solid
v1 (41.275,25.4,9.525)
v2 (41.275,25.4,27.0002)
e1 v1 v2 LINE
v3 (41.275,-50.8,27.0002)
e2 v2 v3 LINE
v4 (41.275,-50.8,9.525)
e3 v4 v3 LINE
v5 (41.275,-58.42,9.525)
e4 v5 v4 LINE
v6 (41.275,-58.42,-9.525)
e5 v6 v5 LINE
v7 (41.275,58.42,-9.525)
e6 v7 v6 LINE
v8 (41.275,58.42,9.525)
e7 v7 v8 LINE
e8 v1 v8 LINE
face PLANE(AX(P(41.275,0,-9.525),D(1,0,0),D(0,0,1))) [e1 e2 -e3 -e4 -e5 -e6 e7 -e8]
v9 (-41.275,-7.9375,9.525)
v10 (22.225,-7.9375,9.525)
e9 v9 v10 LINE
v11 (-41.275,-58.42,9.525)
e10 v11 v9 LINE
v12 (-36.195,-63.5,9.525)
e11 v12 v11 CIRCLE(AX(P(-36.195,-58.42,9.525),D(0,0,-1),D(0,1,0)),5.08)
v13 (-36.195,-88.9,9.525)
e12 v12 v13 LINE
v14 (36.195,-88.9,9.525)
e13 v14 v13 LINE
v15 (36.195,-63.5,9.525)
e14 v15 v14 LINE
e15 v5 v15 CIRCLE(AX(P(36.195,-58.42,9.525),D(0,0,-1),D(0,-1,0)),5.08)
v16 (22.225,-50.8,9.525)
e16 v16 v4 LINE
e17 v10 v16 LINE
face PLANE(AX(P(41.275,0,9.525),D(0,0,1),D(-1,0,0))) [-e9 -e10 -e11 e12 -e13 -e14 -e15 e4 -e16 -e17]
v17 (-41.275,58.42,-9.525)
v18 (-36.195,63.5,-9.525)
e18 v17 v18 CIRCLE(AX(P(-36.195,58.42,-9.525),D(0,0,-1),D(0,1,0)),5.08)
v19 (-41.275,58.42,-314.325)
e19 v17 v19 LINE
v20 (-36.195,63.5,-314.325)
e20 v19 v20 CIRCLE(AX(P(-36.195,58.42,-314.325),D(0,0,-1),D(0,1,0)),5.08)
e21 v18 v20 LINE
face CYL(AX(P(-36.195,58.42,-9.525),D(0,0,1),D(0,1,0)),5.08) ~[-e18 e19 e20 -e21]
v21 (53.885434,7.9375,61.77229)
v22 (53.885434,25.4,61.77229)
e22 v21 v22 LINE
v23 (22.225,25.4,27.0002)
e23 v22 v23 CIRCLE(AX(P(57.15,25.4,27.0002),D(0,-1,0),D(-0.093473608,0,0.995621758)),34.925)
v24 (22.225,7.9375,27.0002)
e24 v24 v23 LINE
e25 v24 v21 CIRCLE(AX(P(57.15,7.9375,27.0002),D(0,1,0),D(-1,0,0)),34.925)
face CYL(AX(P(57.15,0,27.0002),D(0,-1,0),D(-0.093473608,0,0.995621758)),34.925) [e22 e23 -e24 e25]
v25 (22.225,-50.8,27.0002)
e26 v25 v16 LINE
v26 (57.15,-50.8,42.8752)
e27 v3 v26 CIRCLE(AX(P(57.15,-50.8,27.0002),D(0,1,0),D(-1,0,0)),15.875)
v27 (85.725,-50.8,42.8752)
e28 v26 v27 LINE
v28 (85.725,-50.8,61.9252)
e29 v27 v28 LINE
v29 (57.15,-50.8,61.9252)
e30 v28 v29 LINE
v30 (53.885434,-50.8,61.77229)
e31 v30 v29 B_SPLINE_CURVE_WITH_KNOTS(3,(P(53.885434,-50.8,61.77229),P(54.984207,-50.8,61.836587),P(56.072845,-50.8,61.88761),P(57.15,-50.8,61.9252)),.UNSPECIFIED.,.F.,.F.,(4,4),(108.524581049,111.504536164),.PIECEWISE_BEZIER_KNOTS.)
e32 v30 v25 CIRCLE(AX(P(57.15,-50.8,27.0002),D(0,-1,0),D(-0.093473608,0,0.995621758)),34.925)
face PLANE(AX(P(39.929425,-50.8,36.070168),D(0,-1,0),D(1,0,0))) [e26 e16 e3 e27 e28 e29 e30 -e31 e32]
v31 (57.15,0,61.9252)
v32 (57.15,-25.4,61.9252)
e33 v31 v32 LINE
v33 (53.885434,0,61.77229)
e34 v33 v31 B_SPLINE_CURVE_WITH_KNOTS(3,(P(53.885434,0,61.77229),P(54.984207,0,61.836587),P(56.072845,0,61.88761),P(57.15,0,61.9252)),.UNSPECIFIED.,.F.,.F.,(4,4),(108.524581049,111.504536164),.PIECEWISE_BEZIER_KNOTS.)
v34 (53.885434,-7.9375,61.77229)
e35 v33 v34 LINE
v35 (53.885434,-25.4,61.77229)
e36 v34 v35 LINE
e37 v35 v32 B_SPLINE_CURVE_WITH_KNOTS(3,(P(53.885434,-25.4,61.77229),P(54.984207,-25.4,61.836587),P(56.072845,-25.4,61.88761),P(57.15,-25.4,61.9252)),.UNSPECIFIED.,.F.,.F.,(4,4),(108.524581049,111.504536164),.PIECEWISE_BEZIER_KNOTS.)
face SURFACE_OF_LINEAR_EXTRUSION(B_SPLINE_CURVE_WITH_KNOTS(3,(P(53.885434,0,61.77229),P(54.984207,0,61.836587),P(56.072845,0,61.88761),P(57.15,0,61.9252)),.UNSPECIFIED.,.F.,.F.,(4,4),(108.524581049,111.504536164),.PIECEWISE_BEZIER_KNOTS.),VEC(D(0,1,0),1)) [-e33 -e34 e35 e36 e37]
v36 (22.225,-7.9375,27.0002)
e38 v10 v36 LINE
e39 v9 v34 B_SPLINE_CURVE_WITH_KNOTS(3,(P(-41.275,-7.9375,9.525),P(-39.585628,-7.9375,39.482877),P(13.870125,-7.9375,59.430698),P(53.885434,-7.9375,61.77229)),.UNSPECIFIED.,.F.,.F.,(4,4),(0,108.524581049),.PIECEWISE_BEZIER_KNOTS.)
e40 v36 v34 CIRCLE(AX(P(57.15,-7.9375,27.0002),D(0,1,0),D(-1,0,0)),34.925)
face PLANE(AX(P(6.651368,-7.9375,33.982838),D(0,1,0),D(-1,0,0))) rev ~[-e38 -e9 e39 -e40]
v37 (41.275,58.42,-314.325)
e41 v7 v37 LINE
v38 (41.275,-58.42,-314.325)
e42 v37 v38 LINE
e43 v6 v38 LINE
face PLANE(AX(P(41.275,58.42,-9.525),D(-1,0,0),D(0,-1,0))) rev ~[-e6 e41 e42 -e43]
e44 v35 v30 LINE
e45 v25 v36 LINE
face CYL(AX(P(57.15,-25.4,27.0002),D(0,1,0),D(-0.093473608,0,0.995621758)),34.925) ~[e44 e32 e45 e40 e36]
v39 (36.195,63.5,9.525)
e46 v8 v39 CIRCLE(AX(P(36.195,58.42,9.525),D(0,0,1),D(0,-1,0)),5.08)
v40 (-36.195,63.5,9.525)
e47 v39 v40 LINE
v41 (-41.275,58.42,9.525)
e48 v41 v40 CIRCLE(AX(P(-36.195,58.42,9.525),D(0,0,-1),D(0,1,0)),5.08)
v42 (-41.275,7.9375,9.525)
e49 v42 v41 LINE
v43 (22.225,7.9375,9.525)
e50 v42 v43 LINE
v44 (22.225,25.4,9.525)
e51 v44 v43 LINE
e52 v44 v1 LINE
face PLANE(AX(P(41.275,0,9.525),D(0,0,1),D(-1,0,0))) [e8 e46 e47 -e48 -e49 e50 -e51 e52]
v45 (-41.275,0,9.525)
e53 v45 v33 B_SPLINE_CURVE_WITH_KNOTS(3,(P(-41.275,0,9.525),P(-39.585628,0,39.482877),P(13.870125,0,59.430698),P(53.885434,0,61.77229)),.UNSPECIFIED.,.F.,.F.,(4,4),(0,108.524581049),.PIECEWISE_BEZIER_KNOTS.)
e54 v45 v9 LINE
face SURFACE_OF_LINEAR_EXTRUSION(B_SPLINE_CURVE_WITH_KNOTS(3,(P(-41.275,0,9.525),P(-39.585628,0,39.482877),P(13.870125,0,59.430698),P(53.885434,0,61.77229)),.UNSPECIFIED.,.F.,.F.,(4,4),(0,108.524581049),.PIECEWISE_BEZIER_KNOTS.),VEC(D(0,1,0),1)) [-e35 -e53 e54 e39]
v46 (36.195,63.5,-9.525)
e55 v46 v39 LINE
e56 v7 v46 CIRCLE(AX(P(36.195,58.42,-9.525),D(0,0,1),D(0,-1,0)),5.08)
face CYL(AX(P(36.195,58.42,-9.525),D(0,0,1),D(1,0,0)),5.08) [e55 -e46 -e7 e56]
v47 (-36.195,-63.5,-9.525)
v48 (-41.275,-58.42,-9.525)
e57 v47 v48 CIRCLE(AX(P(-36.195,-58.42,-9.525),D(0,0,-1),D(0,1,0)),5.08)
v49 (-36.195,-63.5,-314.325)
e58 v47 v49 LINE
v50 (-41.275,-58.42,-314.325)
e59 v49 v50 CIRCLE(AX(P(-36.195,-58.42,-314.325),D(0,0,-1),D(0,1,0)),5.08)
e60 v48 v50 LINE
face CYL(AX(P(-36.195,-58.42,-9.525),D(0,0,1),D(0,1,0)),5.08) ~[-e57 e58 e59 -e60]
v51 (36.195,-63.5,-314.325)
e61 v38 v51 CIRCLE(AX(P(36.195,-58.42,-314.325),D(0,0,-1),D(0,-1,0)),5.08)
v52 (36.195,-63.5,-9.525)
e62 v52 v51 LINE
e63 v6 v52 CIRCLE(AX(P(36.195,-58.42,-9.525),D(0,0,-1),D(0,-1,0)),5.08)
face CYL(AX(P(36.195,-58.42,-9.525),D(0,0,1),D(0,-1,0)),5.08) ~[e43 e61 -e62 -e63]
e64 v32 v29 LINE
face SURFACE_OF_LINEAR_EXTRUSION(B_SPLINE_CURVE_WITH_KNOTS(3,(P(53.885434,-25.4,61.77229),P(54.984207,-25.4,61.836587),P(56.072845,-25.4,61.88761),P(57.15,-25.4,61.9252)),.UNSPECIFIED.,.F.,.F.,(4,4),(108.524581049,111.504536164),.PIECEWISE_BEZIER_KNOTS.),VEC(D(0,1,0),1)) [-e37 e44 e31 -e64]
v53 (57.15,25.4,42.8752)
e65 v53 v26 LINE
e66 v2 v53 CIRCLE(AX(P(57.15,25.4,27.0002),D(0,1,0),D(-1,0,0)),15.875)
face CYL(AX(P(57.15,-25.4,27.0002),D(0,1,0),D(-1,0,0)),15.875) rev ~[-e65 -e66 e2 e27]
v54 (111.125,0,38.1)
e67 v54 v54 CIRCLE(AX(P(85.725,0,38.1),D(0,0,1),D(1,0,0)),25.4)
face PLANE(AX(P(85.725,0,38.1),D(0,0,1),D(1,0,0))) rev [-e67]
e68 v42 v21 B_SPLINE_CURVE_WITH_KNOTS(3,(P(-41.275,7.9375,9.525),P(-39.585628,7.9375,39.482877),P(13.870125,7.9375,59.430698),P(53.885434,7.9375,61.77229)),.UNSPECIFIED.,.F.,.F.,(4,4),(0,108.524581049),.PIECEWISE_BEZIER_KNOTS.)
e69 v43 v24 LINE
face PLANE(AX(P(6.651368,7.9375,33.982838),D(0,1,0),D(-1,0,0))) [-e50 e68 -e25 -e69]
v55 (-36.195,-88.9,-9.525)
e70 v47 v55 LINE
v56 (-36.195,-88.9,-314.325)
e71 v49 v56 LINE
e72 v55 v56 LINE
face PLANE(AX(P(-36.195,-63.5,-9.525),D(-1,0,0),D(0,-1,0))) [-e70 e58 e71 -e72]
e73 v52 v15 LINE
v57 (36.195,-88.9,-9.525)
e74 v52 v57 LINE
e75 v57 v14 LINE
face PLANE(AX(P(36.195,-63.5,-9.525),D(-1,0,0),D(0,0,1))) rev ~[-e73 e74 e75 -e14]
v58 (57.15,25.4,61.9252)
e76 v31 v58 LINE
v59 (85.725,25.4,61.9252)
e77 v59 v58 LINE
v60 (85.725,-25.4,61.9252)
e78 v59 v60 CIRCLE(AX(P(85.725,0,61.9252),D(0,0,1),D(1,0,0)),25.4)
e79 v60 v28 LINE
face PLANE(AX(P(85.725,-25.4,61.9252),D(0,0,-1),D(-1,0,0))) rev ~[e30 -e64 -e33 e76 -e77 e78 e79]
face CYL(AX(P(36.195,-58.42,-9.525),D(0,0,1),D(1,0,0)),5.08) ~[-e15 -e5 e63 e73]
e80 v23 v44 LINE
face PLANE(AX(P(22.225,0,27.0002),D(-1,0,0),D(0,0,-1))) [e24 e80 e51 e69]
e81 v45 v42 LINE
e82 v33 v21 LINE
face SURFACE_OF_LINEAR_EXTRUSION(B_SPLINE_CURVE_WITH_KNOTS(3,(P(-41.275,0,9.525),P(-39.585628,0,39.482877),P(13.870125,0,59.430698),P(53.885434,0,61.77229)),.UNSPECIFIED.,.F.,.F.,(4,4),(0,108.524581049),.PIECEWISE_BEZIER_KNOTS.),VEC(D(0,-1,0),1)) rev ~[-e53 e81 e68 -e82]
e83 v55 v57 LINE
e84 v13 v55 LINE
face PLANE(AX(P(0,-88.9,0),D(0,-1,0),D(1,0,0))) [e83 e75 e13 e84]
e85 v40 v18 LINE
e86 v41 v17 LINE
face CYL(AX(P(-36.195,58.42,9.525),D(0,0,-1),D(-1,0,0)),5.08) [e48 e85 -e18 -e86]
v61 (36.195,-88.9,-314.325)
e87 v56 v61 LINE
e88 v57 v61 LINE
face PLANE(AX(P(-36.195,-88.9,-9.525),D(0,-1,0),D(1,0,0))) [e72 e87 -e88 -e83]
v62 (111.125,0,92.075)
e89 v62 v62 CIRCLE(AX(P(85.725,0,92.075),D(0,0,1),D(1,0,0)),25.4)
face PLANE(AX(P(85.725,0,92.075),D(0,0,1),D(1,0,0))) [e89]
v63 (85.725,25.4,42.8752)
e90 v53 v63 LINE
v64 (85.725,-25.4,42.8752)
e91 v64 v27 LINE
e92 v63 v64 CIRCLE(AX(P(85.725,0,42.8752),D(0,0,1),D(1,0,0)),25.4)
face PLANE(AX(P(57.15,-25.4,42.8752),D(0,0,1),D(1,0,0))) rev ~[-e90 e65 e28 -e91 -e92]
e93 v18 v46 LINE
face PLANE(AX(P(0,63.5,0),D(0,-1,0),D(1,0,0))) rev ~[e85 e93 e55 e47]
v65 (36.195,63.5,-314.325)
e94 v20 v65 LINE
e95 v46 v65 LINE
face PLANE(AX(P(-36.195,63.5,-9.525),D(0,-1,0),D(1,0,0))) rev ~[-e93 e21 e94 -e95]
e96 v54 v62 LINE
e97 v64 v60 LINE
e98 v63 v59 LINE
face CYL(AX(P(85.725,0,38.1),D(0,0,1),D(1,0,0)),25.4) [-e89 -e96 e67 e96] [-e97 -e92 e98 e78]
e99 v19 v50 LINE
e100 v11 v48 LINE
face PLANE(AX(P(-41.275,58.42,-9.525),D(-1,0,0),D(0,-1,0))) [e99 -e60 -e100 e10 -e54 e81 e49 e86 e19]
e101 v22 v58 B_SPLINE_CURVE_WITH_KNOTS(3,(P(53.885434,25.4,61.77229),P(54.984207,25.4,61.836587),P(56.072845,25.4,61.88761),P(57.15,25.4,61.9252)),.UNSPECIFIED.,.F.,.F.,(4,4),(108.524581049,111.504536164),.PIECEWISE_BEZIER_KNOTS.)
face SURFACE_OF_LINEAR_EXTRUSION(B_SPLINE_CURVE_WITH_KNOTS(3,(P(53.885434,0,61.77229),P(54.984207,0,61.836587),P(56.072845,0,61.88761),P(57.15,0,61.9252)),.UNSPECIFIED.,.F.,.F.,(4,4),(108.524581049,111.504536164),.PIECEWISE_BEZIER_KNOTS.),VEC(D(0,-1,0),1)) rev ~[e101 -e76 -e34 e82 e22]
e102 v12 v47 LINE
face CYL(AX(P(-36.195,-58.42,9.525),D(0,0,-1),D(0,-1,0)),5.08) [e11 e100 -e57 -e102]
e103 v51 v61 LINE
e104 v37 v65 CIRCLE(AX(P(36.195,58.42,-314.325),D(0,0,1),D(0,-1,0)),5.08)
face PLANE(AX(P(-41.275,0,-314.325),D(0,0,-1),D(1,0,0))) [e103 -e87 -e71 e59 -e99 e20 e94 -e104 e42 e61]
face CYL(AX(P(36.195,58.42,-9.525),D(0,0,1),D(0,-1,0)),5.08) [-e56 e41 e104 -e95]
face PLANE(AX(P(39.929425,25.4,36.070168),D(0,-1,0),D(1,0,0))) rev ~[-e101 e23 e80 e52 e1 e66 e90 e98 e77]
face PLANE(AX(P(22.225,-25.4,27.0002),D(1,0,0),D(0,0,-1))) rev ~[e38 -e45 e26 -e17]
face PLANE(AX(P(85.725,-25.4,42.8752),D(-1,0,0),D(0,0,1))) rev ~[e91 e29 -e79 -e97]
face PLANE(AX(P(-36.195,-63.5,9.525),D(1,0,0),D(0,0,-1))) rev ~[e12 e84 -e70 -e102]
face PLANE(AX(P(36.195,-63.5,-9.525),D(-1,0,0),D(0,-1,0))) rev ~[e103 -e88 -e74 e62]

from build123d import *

# Parameters (mm, degrees)
F1_DEPTH = 63.5
F0_W     = 25.4
F0_H     = 19.05
F2_DEPTH = 25.4
F3_DEPTH = 7.9375
F5_R     = 5.08
F6_DEPTH = 25.4
F7_DEPTH = 25.4
F8_DEPTH = 304.8


with BuildPart() as f1:
    # F0 (on Front) → F1 (new body, symmetric)
    with BuildSketch(Plane.XZ):
        Polygon((22.225, 9.525), (-41.275, 9.525), (-41.275, -9.525), (41.275, -9.525), (41.275, 9.525), align=None)
    extrude(amount=F1_DEPTH, both=True)

    # F0 (on Front) → F2 (join, symmetric)
    with BuildSketch(Plane.XZ):
        with BuildLine():
            Line((22.225, 27.0002), (22.225, 9.525))
            Line((22.225, 9.525), (41.275, 9.525))
            Line((41.275, 9.525), (41.275, 27.0002))
            ThreePointArc((41.275, 27.0002), (45.9246798487, 38.2255201513), (57.15, 42.8752))
            Line((57.15, 42.8752), (60.325, 42.8752))
            Line((60.325, 42.8752), (60.325, 61.9252))
            Line((60.325, 61.9252), (57.15, 61.9252))
            add(Edge.make_bspline(
                [(53.8854342407, 61.7722898912), (54.9842067368, 61.8365871986), (56.0728453275, 61.8876096574), (57.15, 61.9252)],
                knots=[108.5245810491, 108.5245810491, 108.5245810491, 108.5245810491, 111.5045361635, 111.5045361635, 111.5045361635, 111.5045361635], degree=3))
            ThreePointArc((53.8854342407, 61.7722898912), (31.3258777096, 50.5133948686), (22.225, 27.0002))
        make_face()
        with Locations((73.025, 52.4002)):
            Rectangle(F0_W, F0_H)
    extrude(amount=F2_DEPTH, both=True)

    # F0 (on Front) → F3 (join, symmetric)
    with BuildSketch(Plane.XZ):
        with BuildLine():
            add(Edge.make_bspline(
                [(-41.275, 9.525), (-39.5856284224, 39.4828766469), (13.870125209, 59.4306981306), (53.8854342407, 61.7722898912)],
                knots=[0, 0, 0, 0, 108.5245810491, 108.5245810491, 108.5245810491, 108.5245810491], degree=3))
            Line((-41.275, 9.525), (22.225, 9.525))
            Line((22.225, 9.525), (22.225, 27.0002))
            ThreePointArc((22.225, 27.0002), (31.3258777096, 50.5133948686), (53.8854342407, 61.7722898912))
        make_face()
    extrude(amount=F3_DEPTH, both=True)

    # F0 (on Front) → F4 (revolve)
    with BuildSketch(Plane.XZ):
        Polygon((85.725, 66.675), (85.725, 61.9252), (85.725, 42.8752), (85.725, 38.1), (111.125, 38.1), (111.125, 66.675), align=None)
    revolve(axis=Axis((85.725, 0, 52.3875), (0, 0, 1)))

    # F5
    f5_edges = [f1.edges().sort_by_distance(p)[0] for p in [
        (41.275, -63.5, 0),
        (-41.275, -63.5, 0),
        (41.275, 63.5, 0),
        (-41.275, 63.5, 0),
    ]]
    fillet(f5_edges, radius=F5_R)

    # F6 (add): a face of the model
    f6_faces = [f1.faces().sort_by_distance(p)[0] for p in [
        (85.725, 0, 66.675),
    ]]
    extrude(f6_faces, amount=F6_DEPTH)

    # F7 (add): faces of the model
    f7_faces = [f1.faces().sort_by_distance(p)[0] for p in [
        (48.8772671015, -25.4, 41.5257592525),
        (0, -63.5, 0),
    ]]
    extrude(f7_faces, amount=F7_DEPTH)

    # F8 (add): a face of the model
    f8_faces = [f1.faces().sort_by_distance(p)[0] for p in [
        (0, -11.3906341446, -9.525),
    ]]
    extrude(f8_faces, amount=F8_DEPTH)


solid = f1.part
